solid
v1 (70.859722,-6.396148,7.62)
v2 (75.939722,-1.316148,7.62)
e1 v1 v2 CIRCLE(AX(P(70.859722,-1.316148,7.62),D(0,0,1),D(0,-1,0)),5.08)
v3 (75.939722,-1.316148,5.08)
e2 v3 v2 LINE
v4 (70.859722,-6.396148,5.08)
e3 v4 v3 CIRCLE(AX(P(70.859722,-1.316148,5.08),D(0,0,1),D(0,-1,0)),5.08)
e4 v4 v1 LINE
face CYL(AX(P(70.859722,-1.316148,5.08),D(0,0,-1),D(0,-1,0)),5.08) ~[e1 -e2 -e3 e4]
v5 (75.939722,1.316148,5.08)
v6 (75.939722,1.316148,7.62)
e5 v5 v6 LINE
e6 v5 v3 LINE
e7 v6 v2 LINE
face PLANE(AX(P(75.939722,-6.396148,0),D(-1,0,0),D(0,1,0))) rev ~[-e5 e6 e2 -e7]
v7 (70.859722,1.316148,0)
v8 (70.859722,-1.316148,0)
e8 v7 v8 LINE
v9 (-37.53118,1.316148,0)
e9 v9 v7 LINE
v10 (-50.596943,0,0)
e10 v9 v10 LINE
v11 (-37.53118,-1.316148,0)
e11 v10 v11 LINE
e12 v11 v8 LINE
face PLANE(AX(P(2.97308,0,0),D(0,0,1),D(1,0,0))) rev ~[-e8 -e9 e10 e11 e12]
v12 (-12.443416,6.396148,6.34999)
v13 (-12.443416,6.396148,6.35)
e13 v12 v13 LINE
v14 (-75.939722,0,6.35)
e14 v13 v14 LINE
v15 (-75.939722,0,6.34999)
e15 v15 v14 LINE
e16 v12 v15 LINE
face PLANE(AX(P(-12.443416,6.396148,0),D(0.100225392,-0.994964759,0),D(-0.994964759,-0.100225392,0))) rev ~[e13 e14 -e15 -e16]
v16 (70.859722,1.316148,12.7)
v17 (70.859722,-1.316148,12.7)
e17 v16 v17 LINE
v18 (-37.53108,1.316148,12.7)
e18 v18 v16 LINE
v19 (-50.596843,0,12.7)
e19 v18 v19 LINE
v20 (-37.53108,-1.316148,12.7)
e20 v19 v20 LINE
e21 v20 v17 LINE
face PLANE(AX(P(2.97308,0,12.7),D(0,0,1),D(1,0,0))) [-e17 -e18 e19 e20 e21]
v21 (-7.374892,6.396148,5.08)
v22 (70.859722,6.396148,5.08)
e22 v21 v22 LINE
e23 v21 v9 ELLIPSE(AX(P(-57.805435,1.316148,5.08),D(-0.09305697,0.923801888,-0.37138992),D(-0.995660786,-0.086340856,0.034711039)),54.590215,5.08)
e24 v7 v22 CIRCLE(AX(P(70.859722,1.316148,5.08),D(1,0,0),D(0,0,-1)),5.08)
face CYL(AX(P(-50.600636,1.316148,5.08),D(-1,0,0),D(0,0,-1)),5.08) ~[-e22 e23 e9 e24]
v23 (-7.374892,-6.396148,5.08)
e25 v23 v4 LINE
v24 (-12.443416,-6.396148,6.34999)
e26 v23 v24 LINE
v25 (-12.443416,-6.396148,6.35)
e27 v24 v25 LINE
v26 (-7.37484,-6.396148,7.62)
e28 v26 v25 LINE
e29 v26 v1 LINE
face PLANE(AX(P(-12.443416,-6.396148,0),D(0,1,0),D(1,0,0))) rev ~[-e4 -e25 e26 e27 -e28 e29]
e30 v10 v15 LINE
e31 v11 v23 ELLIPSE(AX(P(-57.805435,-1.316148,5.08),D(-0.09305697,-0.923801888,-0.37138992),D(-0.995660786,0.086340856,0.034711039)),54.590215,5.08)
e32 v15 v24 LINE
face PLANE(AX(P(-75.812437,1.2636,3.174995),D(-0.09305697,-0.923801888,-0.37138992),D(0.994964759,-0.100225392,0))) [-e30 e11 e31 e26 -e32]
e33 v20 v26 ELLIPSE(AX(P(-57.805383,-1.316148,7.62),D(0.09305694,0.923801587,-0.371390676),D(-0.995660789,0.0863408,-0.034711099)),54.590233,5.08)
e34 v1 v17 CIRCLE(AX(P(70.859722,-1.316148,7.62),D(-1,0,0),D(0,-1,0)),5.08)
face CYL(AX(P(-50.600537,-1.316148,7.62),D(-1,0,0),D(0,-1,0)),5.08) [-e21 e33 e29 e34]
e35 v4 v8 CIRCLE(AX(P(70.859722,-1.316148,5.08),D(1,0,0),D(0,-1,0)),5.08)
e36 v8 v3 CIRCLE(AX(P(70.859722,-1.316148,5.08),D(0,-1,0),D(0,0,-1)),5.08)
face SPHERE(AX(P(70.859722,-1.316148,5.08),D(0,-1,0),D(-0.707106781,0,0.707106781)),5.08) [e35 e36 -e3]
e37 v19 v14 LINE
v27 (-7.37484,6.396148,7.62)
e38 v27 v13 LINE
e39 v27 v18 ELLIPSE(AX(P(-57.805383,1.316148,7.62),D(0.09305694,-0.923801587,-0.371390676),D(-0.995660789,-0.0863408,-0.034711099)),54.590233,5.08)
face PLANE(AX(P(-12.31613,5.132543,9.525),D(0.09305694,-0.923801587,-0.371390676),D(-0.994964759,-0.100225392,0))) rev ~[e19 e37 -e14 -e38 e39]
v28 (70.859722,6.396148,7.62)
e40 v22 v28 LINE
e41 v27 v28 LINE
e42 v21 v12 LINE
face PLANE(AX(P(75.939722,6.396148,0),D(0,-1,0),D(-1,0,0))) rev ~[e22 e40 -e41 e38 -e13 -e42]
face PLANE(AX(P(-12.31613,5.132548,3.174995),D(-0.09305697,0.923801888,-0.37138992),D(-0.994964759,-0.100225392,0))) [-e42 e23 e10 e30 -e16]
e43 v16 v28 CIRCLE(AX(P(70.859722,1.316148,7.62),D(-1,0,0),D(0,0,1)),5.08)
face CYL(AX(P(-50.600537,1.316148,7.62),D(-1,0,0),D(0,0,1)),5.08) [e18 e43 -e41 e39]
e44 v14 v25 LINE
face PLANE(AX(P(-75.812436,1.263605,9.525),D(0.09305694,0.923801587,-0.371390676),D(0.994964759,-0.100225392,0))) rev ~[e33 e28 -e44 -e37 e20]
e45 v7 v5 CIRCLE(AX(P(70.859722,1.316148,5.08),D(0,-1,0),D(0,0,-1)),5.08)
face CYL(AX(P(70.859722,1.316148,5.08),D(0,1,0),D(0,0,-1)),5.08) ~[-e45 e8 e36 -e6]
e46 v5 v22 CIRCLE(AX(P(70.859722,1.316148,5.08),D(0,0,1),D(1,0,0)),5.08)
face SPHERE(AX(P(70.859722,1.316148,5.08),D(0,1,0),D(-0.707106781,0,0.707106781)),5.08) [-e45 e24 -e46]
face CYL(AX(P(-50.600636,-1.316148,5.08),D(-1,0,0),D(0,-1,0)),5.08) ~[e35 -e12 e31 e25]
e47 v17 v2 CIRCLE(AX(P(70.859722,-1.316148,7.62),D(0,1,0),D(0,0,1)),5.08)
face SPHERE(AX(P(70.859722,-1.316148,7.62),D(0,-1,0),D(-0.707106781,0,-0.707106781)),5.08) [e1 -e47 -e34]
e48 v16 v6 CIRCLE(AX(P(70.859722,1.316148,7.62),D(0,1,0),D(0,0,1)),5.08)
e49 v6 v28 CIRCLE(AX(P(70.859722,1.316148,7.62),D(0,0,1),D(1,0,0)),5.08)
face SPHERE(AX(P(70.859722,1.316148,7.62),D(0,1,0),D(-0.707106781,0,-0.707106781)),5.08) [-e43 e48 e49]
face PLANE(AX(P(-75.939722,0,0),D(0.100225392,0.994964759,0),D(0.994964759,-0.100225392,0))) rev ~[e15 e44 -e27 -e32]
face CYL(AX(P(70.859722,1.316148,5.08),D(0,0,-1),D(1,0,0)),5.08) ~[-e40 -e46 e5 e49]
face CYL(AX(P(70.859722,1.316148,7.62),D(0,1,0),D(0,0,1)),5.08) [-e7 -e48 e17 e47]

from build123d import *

# Parameters (mm, degrees)
F1_DEPTH     = 12.7
F2_SIZE2     = 6.35
F2_SIZE      = 2.54
F2_2_SIZE2   = 6.34999
F2_2_SIZE    = 2.53999
F3_T1_DEPTH  = 121.4602589597
F3_T3_DEPTH  = 121.4603587348
F3_T5_DEPTH  = 2.54
F3_T7_DEPTH  = 2.6322967076
F3_S11_W     = 5.08
F3_S11_H     = 5.08
F3_T12_DEPTH = 5.08
F3_S17_W     = 5.08
F3_S17_H     = 5.08
F3_T18_DEPTH = 5.08
F3_S23_W     = 5.08
F3_S23_H     = 5.08
F3_T24_DEPTH = 5.08
F3_S29_W     = 5.08
F3_S29_H     = 5.08
F3_T30_DEPTH = 5.08


# Not quite as in the source:
# - a fillet or chamfer that OpenCascade refuses, or shapes differently, is made with other operations: its cross-section is extruded or revolved along the edge and cut away or added
# - a fillet or chamfer is up to 0.001 mm smaller than in the source, because OpenCascade refuses the exact size


with BuildPart() as f1:
    # F0 (on Top) → F1 (new body)
    with BuildSketch(Plane.XY):
        Polygon((75.9397223592, -6.3961483538), (75.9397223592, 6.3961483538), (-12.4434158206, 6.3961483538), (-75.9397223592, 0), (-12.4434158206, -6.3961483538), align=None)
    extrude(amount=F1_DEPTH)

    # F2
    f2_edges = [f1.edges().sort_by_distance(p)[0] for p in [
        (-44.191569, -3.198074, 12.7),
        (-44.191569, 3.198074, 12.7),
    ]]
    f2_side = f1.faces().sort_by_distance((14.475683, 0, 12.7))[0]
    chamfer(f2_edges, length=F2_SIZE, length2=F2_SIZE2, reference=f2_side)

    # F2#2 (size 2.54 and 6.35 in the source; OpenCascade refuses exactly that, so slightly less here)
    f2_2_edges = [f1.edges().sort_by_distance(p)[0] for p in [
        (-44.191569, -3.198074, 0),
        (-44.191569, 3.198074, 0),
    ]]
    f2_2_side = f1.faces().sort_by_distance((14.475683, 0, 0))[0]
    chamfer(f2_2_edges, length=F2_2_SIZE, length2=F2_2_SIZE2, reference=f2_2_side)

    # F3: fillet of radius 5.08 on 8 edges, made by hand

    # F3_s2 → F3_t1 (cut)
    with BuildSketch(Plane.YZ.offset(-50.6005366005)):
        with BuildLine():
            ThreePointArc((-6.3961483538, 7.62), (-4.9082508022, 11.2121024484), (-1.3161483538, 12.7))
            Line((-1.3161483538, 12.7), (-6.3961483538, 12.7))
            Line((-6.3961483538, 12.7), (-6.3961483538, 7.62))
        make_face()
        with BuildLine():
            ThreePointArc((1.3161483538, 12.7), (4.9082508022, 11.2121024484), (6.3961483538, 7.62))
            Line((6.3961483538, 7.62), (6.3961483538, 12.7))
            Line((6.3961483538, 12.7), (1.3161483538, 12.7))
        make_face()
    extrude(amount=F3_T1_DEPTH, mode=Mode.SUBTRACT)

    # F3_s4 → F3_t3 (cut)
    with BuildSketch(Plane.YZ.offset(-50.6006363756)):
        with BuildLine():
            ThreePointArc((-6.3961483538, 5.08), (-4.9082508022, 1.4878975516), (-1.3161483538, 0))
            Line((-1.3161483538, 0), (-6.3961483538, 0))
            Line((-6.3961483538, 0), (-6.3961483538, 5.08))
        make_face()
        with BuildLine():
            ThreePointArc((1.3161483538, 0), (4.9082508022, 1.4878975516), (6.3961483538, 5.08))
            Line((6.3961483538, 5.08), (6.3961483538, 0))
            Line((6.3961483538, 0), (1.3161483538, 0))
        make_face()
    extrude(amount=F3_T3_DEPTH, mode=Mode.SUBTRACT)

    # F3_s6 → F3_t5 (cut)
    with BuildSketch(Plane.XY.offset(5.08)):
        with BuildLine():
            ThreePointArc((70.8597223592, -6.3961483538), (74.4518248076, -4.9082508022), (75.9397223592, -1.3161483538))
            Line((75.9397223592, -1.3161483538), (75.9397223592, -6.3961483538))
            Line((75.9397223592, -6.3961483538), (70.8597223592, -6.3961483538))
        make_face()
        with BuildLine():
            ThreePointArc((75.9397223592, 1.3161483538), (74.4518248076, 4.9082508022), (70.8597223592, 6.3961483538))
            Line((70.8597223592, 6.3961483538), (75.9397223592, 6.3961483538))
            Line((75.9397223592, 6.3961483538), (75.9397223592, 1.3161483538))
        make_face()
    extrude(amount=F3_T5_DEPTH, mode=Mode.SUBTRACT)

    # F3_s8 → F3_t7 (cut)
    with BuildSketch(Plane.XZ.offset(-1.3161483538)):
        with BuildLine():
            ThreePointArc((70.8597223592, 12.7), (74.4518248076, 11.2121024484), (75.9397223592, 7.62))
            Line((75.9397223592, 7.62), (75.9397223592, 12.7))
            Line((75.9397223592, 12.7), (70.8597223592, 12.7))
        make_face()
        with BuildLine():
            ThreePointArc((70.8597223592, 0), (74.4518248076, 1.4878975516), (75.9397223592, 5.08))
            Line((75.9397223592, 5.08), (75.9397223592, 0))
            Line((75.9397223592, 0), (70.8597223592, 0))
        make_face()
    extrude(amount=F3_T7_DEPTH, mode=Mode.SUBTRACT)


with BuildPart() as f3_tool10:
    # F3_s11 → F3_t12 (new body)
    with BuildSketch(Plane.XZ.offset(1.3161483538)):
        with Locations((73.3997223592, 10.16)):
            Rectangle(F3_S11_W, F3_S11_H)
    extrude(amount=F3_T12_DEPTH)

    # F3_s13 → F3_t14 (revolve, cut)
    with BuildSketch(Plane(origin=(70.8597223592, -1.3161483538, 7.62), x_dir=(-0.7071067812, 0, -0.7071067812), z_dir=(-0.7071067812, 0, 0.7071067812))):
        with BuildLine():
            ThreePointArc((0, -5.08), (5.08, 0), (0, 5.08))
            Line((0, 5.08), (0, -5.08))
        make_face()
    revolve(axis=Axis((70.8597223592, -1.3161483538, 7.62), (0, -1, 0)), mode=Mode.SUBTRACT)


with BuildPart() as f1_1:
    add(f1.part)

    # F3_t9: cut F3_tool10
    add(f3_tool10.part, mode=Mode.SUBTRACT)


with BuildPart() as f3_tool16:
    # F3_s17 → F3_t18 (new body)
    with BuildSketch(Plane.XZ.offset(1.3161483538)):
        with Locations((73.3997223592, 2.54)):
            Rectangle(F3_S17_W, F3_S17_H)
    extrude(amount=F3_T18_DEPTH)

    # F3_s19 → F3_t20 (revolve, cut)
    with BuildSketch(Plane(origin=(70.8597223592, -1.3161483538, 5.08), x_dir=(-0.7071067812, 0, 0.7071067812), z_dir=(0.7071067812, 0, 0.7071067812))):
        with BuildLine():
            ThreePointArc((0, -5.08), (5.08, 0), (0, 5.08))
            Line((0, 5.08), (0, -5.08))
        make_face()
    revolve(axis=Axis((70.8597223592, -1.3161483538, 5.08), (0, -1, 0)), mode=Mode.SUBTRACT)


with BuildPart() as f1_2:
    add(f1_1.part)

    # F3_t15: cut F3_tool16
    add(f3_tool16.part, mode=Mode.SUBTRACT)


with BuildPart() as f3_tool22:
    # F3_s23 → F3_t24 (new body)
    with BuildSketch(Plane.XZ.offset(-1.3161483538)):
        with Locations((73.3997223592, 2.54)):
            Rectangle(F3_S23_W, F3_S23_H)
    extrude(amount=-F3_T24_DEPTH)

    # F3_s25 → F3_t26 (revolve, cut)
    with BuildSketch(Plane(origin=(70.8597223592, 1.3161483538, 5.08), x_dir=(-0.7071067812, 0, 0.7071067812), z_dir=(-0.7071067812, 0, -0.7071067812))):
        with BuildLine():
            ThreePointArc((0, -5.08), (5.08, 0), (0, 5.08))
            Line((0, 5.08), (0, -5.08))
        make_face()
    revolve(axis=Axis((70.8597223592, 1.3161483538, 5.08), (0, 1, 0)), mode=Mode.SUBTRACT)


with BuildPart() as f1_3:
    add(f1_2.part)

    # F3_t21: cut F3_tool22
    add(f3_tool22.part, mode=Mode.SUBTRACT)


with BuildPart() as f3_tool28:
    # F3_s29 → F3_t30 (new body)
    with BuildSketch(Plane.XZ.offset(-1.3161483538)):
        with Locations((73.3997223592, 10.16)):
            Rectangle(F3_S29_W, F3_S29_H)
    extrude(amount=-F3_T30_DEPTH)

    # F3_s31 → F3_t32 (revolve, cut)
    with BuildSketch(Plane(origin=(70.8597223592, 1.3161483538, 7.62), x_dir=(-0.7071067812, 0, -0.7071067812), z_dir=(0.7071067812, 0, -0.7071067812))):
        with BuildLine():
            ThreePointArc((0, -5.08), (5.08, 0), (0, 5.08))
            Line((0, 5.08), (0, -5.08))
        make_face()
    revolve(axis=Axis((70.8597223592, 1.3161483538, 7.62), (0, 1, 0)), mode=Mode.SUBTRACT)


with BuildPart() as f1_4:
    add(f1_3.part)

    # F3_t27: cut F3_tool28
    add(f3_tool28.part, mode=Mode.SUBTRACT)


solid = f1_4.part
